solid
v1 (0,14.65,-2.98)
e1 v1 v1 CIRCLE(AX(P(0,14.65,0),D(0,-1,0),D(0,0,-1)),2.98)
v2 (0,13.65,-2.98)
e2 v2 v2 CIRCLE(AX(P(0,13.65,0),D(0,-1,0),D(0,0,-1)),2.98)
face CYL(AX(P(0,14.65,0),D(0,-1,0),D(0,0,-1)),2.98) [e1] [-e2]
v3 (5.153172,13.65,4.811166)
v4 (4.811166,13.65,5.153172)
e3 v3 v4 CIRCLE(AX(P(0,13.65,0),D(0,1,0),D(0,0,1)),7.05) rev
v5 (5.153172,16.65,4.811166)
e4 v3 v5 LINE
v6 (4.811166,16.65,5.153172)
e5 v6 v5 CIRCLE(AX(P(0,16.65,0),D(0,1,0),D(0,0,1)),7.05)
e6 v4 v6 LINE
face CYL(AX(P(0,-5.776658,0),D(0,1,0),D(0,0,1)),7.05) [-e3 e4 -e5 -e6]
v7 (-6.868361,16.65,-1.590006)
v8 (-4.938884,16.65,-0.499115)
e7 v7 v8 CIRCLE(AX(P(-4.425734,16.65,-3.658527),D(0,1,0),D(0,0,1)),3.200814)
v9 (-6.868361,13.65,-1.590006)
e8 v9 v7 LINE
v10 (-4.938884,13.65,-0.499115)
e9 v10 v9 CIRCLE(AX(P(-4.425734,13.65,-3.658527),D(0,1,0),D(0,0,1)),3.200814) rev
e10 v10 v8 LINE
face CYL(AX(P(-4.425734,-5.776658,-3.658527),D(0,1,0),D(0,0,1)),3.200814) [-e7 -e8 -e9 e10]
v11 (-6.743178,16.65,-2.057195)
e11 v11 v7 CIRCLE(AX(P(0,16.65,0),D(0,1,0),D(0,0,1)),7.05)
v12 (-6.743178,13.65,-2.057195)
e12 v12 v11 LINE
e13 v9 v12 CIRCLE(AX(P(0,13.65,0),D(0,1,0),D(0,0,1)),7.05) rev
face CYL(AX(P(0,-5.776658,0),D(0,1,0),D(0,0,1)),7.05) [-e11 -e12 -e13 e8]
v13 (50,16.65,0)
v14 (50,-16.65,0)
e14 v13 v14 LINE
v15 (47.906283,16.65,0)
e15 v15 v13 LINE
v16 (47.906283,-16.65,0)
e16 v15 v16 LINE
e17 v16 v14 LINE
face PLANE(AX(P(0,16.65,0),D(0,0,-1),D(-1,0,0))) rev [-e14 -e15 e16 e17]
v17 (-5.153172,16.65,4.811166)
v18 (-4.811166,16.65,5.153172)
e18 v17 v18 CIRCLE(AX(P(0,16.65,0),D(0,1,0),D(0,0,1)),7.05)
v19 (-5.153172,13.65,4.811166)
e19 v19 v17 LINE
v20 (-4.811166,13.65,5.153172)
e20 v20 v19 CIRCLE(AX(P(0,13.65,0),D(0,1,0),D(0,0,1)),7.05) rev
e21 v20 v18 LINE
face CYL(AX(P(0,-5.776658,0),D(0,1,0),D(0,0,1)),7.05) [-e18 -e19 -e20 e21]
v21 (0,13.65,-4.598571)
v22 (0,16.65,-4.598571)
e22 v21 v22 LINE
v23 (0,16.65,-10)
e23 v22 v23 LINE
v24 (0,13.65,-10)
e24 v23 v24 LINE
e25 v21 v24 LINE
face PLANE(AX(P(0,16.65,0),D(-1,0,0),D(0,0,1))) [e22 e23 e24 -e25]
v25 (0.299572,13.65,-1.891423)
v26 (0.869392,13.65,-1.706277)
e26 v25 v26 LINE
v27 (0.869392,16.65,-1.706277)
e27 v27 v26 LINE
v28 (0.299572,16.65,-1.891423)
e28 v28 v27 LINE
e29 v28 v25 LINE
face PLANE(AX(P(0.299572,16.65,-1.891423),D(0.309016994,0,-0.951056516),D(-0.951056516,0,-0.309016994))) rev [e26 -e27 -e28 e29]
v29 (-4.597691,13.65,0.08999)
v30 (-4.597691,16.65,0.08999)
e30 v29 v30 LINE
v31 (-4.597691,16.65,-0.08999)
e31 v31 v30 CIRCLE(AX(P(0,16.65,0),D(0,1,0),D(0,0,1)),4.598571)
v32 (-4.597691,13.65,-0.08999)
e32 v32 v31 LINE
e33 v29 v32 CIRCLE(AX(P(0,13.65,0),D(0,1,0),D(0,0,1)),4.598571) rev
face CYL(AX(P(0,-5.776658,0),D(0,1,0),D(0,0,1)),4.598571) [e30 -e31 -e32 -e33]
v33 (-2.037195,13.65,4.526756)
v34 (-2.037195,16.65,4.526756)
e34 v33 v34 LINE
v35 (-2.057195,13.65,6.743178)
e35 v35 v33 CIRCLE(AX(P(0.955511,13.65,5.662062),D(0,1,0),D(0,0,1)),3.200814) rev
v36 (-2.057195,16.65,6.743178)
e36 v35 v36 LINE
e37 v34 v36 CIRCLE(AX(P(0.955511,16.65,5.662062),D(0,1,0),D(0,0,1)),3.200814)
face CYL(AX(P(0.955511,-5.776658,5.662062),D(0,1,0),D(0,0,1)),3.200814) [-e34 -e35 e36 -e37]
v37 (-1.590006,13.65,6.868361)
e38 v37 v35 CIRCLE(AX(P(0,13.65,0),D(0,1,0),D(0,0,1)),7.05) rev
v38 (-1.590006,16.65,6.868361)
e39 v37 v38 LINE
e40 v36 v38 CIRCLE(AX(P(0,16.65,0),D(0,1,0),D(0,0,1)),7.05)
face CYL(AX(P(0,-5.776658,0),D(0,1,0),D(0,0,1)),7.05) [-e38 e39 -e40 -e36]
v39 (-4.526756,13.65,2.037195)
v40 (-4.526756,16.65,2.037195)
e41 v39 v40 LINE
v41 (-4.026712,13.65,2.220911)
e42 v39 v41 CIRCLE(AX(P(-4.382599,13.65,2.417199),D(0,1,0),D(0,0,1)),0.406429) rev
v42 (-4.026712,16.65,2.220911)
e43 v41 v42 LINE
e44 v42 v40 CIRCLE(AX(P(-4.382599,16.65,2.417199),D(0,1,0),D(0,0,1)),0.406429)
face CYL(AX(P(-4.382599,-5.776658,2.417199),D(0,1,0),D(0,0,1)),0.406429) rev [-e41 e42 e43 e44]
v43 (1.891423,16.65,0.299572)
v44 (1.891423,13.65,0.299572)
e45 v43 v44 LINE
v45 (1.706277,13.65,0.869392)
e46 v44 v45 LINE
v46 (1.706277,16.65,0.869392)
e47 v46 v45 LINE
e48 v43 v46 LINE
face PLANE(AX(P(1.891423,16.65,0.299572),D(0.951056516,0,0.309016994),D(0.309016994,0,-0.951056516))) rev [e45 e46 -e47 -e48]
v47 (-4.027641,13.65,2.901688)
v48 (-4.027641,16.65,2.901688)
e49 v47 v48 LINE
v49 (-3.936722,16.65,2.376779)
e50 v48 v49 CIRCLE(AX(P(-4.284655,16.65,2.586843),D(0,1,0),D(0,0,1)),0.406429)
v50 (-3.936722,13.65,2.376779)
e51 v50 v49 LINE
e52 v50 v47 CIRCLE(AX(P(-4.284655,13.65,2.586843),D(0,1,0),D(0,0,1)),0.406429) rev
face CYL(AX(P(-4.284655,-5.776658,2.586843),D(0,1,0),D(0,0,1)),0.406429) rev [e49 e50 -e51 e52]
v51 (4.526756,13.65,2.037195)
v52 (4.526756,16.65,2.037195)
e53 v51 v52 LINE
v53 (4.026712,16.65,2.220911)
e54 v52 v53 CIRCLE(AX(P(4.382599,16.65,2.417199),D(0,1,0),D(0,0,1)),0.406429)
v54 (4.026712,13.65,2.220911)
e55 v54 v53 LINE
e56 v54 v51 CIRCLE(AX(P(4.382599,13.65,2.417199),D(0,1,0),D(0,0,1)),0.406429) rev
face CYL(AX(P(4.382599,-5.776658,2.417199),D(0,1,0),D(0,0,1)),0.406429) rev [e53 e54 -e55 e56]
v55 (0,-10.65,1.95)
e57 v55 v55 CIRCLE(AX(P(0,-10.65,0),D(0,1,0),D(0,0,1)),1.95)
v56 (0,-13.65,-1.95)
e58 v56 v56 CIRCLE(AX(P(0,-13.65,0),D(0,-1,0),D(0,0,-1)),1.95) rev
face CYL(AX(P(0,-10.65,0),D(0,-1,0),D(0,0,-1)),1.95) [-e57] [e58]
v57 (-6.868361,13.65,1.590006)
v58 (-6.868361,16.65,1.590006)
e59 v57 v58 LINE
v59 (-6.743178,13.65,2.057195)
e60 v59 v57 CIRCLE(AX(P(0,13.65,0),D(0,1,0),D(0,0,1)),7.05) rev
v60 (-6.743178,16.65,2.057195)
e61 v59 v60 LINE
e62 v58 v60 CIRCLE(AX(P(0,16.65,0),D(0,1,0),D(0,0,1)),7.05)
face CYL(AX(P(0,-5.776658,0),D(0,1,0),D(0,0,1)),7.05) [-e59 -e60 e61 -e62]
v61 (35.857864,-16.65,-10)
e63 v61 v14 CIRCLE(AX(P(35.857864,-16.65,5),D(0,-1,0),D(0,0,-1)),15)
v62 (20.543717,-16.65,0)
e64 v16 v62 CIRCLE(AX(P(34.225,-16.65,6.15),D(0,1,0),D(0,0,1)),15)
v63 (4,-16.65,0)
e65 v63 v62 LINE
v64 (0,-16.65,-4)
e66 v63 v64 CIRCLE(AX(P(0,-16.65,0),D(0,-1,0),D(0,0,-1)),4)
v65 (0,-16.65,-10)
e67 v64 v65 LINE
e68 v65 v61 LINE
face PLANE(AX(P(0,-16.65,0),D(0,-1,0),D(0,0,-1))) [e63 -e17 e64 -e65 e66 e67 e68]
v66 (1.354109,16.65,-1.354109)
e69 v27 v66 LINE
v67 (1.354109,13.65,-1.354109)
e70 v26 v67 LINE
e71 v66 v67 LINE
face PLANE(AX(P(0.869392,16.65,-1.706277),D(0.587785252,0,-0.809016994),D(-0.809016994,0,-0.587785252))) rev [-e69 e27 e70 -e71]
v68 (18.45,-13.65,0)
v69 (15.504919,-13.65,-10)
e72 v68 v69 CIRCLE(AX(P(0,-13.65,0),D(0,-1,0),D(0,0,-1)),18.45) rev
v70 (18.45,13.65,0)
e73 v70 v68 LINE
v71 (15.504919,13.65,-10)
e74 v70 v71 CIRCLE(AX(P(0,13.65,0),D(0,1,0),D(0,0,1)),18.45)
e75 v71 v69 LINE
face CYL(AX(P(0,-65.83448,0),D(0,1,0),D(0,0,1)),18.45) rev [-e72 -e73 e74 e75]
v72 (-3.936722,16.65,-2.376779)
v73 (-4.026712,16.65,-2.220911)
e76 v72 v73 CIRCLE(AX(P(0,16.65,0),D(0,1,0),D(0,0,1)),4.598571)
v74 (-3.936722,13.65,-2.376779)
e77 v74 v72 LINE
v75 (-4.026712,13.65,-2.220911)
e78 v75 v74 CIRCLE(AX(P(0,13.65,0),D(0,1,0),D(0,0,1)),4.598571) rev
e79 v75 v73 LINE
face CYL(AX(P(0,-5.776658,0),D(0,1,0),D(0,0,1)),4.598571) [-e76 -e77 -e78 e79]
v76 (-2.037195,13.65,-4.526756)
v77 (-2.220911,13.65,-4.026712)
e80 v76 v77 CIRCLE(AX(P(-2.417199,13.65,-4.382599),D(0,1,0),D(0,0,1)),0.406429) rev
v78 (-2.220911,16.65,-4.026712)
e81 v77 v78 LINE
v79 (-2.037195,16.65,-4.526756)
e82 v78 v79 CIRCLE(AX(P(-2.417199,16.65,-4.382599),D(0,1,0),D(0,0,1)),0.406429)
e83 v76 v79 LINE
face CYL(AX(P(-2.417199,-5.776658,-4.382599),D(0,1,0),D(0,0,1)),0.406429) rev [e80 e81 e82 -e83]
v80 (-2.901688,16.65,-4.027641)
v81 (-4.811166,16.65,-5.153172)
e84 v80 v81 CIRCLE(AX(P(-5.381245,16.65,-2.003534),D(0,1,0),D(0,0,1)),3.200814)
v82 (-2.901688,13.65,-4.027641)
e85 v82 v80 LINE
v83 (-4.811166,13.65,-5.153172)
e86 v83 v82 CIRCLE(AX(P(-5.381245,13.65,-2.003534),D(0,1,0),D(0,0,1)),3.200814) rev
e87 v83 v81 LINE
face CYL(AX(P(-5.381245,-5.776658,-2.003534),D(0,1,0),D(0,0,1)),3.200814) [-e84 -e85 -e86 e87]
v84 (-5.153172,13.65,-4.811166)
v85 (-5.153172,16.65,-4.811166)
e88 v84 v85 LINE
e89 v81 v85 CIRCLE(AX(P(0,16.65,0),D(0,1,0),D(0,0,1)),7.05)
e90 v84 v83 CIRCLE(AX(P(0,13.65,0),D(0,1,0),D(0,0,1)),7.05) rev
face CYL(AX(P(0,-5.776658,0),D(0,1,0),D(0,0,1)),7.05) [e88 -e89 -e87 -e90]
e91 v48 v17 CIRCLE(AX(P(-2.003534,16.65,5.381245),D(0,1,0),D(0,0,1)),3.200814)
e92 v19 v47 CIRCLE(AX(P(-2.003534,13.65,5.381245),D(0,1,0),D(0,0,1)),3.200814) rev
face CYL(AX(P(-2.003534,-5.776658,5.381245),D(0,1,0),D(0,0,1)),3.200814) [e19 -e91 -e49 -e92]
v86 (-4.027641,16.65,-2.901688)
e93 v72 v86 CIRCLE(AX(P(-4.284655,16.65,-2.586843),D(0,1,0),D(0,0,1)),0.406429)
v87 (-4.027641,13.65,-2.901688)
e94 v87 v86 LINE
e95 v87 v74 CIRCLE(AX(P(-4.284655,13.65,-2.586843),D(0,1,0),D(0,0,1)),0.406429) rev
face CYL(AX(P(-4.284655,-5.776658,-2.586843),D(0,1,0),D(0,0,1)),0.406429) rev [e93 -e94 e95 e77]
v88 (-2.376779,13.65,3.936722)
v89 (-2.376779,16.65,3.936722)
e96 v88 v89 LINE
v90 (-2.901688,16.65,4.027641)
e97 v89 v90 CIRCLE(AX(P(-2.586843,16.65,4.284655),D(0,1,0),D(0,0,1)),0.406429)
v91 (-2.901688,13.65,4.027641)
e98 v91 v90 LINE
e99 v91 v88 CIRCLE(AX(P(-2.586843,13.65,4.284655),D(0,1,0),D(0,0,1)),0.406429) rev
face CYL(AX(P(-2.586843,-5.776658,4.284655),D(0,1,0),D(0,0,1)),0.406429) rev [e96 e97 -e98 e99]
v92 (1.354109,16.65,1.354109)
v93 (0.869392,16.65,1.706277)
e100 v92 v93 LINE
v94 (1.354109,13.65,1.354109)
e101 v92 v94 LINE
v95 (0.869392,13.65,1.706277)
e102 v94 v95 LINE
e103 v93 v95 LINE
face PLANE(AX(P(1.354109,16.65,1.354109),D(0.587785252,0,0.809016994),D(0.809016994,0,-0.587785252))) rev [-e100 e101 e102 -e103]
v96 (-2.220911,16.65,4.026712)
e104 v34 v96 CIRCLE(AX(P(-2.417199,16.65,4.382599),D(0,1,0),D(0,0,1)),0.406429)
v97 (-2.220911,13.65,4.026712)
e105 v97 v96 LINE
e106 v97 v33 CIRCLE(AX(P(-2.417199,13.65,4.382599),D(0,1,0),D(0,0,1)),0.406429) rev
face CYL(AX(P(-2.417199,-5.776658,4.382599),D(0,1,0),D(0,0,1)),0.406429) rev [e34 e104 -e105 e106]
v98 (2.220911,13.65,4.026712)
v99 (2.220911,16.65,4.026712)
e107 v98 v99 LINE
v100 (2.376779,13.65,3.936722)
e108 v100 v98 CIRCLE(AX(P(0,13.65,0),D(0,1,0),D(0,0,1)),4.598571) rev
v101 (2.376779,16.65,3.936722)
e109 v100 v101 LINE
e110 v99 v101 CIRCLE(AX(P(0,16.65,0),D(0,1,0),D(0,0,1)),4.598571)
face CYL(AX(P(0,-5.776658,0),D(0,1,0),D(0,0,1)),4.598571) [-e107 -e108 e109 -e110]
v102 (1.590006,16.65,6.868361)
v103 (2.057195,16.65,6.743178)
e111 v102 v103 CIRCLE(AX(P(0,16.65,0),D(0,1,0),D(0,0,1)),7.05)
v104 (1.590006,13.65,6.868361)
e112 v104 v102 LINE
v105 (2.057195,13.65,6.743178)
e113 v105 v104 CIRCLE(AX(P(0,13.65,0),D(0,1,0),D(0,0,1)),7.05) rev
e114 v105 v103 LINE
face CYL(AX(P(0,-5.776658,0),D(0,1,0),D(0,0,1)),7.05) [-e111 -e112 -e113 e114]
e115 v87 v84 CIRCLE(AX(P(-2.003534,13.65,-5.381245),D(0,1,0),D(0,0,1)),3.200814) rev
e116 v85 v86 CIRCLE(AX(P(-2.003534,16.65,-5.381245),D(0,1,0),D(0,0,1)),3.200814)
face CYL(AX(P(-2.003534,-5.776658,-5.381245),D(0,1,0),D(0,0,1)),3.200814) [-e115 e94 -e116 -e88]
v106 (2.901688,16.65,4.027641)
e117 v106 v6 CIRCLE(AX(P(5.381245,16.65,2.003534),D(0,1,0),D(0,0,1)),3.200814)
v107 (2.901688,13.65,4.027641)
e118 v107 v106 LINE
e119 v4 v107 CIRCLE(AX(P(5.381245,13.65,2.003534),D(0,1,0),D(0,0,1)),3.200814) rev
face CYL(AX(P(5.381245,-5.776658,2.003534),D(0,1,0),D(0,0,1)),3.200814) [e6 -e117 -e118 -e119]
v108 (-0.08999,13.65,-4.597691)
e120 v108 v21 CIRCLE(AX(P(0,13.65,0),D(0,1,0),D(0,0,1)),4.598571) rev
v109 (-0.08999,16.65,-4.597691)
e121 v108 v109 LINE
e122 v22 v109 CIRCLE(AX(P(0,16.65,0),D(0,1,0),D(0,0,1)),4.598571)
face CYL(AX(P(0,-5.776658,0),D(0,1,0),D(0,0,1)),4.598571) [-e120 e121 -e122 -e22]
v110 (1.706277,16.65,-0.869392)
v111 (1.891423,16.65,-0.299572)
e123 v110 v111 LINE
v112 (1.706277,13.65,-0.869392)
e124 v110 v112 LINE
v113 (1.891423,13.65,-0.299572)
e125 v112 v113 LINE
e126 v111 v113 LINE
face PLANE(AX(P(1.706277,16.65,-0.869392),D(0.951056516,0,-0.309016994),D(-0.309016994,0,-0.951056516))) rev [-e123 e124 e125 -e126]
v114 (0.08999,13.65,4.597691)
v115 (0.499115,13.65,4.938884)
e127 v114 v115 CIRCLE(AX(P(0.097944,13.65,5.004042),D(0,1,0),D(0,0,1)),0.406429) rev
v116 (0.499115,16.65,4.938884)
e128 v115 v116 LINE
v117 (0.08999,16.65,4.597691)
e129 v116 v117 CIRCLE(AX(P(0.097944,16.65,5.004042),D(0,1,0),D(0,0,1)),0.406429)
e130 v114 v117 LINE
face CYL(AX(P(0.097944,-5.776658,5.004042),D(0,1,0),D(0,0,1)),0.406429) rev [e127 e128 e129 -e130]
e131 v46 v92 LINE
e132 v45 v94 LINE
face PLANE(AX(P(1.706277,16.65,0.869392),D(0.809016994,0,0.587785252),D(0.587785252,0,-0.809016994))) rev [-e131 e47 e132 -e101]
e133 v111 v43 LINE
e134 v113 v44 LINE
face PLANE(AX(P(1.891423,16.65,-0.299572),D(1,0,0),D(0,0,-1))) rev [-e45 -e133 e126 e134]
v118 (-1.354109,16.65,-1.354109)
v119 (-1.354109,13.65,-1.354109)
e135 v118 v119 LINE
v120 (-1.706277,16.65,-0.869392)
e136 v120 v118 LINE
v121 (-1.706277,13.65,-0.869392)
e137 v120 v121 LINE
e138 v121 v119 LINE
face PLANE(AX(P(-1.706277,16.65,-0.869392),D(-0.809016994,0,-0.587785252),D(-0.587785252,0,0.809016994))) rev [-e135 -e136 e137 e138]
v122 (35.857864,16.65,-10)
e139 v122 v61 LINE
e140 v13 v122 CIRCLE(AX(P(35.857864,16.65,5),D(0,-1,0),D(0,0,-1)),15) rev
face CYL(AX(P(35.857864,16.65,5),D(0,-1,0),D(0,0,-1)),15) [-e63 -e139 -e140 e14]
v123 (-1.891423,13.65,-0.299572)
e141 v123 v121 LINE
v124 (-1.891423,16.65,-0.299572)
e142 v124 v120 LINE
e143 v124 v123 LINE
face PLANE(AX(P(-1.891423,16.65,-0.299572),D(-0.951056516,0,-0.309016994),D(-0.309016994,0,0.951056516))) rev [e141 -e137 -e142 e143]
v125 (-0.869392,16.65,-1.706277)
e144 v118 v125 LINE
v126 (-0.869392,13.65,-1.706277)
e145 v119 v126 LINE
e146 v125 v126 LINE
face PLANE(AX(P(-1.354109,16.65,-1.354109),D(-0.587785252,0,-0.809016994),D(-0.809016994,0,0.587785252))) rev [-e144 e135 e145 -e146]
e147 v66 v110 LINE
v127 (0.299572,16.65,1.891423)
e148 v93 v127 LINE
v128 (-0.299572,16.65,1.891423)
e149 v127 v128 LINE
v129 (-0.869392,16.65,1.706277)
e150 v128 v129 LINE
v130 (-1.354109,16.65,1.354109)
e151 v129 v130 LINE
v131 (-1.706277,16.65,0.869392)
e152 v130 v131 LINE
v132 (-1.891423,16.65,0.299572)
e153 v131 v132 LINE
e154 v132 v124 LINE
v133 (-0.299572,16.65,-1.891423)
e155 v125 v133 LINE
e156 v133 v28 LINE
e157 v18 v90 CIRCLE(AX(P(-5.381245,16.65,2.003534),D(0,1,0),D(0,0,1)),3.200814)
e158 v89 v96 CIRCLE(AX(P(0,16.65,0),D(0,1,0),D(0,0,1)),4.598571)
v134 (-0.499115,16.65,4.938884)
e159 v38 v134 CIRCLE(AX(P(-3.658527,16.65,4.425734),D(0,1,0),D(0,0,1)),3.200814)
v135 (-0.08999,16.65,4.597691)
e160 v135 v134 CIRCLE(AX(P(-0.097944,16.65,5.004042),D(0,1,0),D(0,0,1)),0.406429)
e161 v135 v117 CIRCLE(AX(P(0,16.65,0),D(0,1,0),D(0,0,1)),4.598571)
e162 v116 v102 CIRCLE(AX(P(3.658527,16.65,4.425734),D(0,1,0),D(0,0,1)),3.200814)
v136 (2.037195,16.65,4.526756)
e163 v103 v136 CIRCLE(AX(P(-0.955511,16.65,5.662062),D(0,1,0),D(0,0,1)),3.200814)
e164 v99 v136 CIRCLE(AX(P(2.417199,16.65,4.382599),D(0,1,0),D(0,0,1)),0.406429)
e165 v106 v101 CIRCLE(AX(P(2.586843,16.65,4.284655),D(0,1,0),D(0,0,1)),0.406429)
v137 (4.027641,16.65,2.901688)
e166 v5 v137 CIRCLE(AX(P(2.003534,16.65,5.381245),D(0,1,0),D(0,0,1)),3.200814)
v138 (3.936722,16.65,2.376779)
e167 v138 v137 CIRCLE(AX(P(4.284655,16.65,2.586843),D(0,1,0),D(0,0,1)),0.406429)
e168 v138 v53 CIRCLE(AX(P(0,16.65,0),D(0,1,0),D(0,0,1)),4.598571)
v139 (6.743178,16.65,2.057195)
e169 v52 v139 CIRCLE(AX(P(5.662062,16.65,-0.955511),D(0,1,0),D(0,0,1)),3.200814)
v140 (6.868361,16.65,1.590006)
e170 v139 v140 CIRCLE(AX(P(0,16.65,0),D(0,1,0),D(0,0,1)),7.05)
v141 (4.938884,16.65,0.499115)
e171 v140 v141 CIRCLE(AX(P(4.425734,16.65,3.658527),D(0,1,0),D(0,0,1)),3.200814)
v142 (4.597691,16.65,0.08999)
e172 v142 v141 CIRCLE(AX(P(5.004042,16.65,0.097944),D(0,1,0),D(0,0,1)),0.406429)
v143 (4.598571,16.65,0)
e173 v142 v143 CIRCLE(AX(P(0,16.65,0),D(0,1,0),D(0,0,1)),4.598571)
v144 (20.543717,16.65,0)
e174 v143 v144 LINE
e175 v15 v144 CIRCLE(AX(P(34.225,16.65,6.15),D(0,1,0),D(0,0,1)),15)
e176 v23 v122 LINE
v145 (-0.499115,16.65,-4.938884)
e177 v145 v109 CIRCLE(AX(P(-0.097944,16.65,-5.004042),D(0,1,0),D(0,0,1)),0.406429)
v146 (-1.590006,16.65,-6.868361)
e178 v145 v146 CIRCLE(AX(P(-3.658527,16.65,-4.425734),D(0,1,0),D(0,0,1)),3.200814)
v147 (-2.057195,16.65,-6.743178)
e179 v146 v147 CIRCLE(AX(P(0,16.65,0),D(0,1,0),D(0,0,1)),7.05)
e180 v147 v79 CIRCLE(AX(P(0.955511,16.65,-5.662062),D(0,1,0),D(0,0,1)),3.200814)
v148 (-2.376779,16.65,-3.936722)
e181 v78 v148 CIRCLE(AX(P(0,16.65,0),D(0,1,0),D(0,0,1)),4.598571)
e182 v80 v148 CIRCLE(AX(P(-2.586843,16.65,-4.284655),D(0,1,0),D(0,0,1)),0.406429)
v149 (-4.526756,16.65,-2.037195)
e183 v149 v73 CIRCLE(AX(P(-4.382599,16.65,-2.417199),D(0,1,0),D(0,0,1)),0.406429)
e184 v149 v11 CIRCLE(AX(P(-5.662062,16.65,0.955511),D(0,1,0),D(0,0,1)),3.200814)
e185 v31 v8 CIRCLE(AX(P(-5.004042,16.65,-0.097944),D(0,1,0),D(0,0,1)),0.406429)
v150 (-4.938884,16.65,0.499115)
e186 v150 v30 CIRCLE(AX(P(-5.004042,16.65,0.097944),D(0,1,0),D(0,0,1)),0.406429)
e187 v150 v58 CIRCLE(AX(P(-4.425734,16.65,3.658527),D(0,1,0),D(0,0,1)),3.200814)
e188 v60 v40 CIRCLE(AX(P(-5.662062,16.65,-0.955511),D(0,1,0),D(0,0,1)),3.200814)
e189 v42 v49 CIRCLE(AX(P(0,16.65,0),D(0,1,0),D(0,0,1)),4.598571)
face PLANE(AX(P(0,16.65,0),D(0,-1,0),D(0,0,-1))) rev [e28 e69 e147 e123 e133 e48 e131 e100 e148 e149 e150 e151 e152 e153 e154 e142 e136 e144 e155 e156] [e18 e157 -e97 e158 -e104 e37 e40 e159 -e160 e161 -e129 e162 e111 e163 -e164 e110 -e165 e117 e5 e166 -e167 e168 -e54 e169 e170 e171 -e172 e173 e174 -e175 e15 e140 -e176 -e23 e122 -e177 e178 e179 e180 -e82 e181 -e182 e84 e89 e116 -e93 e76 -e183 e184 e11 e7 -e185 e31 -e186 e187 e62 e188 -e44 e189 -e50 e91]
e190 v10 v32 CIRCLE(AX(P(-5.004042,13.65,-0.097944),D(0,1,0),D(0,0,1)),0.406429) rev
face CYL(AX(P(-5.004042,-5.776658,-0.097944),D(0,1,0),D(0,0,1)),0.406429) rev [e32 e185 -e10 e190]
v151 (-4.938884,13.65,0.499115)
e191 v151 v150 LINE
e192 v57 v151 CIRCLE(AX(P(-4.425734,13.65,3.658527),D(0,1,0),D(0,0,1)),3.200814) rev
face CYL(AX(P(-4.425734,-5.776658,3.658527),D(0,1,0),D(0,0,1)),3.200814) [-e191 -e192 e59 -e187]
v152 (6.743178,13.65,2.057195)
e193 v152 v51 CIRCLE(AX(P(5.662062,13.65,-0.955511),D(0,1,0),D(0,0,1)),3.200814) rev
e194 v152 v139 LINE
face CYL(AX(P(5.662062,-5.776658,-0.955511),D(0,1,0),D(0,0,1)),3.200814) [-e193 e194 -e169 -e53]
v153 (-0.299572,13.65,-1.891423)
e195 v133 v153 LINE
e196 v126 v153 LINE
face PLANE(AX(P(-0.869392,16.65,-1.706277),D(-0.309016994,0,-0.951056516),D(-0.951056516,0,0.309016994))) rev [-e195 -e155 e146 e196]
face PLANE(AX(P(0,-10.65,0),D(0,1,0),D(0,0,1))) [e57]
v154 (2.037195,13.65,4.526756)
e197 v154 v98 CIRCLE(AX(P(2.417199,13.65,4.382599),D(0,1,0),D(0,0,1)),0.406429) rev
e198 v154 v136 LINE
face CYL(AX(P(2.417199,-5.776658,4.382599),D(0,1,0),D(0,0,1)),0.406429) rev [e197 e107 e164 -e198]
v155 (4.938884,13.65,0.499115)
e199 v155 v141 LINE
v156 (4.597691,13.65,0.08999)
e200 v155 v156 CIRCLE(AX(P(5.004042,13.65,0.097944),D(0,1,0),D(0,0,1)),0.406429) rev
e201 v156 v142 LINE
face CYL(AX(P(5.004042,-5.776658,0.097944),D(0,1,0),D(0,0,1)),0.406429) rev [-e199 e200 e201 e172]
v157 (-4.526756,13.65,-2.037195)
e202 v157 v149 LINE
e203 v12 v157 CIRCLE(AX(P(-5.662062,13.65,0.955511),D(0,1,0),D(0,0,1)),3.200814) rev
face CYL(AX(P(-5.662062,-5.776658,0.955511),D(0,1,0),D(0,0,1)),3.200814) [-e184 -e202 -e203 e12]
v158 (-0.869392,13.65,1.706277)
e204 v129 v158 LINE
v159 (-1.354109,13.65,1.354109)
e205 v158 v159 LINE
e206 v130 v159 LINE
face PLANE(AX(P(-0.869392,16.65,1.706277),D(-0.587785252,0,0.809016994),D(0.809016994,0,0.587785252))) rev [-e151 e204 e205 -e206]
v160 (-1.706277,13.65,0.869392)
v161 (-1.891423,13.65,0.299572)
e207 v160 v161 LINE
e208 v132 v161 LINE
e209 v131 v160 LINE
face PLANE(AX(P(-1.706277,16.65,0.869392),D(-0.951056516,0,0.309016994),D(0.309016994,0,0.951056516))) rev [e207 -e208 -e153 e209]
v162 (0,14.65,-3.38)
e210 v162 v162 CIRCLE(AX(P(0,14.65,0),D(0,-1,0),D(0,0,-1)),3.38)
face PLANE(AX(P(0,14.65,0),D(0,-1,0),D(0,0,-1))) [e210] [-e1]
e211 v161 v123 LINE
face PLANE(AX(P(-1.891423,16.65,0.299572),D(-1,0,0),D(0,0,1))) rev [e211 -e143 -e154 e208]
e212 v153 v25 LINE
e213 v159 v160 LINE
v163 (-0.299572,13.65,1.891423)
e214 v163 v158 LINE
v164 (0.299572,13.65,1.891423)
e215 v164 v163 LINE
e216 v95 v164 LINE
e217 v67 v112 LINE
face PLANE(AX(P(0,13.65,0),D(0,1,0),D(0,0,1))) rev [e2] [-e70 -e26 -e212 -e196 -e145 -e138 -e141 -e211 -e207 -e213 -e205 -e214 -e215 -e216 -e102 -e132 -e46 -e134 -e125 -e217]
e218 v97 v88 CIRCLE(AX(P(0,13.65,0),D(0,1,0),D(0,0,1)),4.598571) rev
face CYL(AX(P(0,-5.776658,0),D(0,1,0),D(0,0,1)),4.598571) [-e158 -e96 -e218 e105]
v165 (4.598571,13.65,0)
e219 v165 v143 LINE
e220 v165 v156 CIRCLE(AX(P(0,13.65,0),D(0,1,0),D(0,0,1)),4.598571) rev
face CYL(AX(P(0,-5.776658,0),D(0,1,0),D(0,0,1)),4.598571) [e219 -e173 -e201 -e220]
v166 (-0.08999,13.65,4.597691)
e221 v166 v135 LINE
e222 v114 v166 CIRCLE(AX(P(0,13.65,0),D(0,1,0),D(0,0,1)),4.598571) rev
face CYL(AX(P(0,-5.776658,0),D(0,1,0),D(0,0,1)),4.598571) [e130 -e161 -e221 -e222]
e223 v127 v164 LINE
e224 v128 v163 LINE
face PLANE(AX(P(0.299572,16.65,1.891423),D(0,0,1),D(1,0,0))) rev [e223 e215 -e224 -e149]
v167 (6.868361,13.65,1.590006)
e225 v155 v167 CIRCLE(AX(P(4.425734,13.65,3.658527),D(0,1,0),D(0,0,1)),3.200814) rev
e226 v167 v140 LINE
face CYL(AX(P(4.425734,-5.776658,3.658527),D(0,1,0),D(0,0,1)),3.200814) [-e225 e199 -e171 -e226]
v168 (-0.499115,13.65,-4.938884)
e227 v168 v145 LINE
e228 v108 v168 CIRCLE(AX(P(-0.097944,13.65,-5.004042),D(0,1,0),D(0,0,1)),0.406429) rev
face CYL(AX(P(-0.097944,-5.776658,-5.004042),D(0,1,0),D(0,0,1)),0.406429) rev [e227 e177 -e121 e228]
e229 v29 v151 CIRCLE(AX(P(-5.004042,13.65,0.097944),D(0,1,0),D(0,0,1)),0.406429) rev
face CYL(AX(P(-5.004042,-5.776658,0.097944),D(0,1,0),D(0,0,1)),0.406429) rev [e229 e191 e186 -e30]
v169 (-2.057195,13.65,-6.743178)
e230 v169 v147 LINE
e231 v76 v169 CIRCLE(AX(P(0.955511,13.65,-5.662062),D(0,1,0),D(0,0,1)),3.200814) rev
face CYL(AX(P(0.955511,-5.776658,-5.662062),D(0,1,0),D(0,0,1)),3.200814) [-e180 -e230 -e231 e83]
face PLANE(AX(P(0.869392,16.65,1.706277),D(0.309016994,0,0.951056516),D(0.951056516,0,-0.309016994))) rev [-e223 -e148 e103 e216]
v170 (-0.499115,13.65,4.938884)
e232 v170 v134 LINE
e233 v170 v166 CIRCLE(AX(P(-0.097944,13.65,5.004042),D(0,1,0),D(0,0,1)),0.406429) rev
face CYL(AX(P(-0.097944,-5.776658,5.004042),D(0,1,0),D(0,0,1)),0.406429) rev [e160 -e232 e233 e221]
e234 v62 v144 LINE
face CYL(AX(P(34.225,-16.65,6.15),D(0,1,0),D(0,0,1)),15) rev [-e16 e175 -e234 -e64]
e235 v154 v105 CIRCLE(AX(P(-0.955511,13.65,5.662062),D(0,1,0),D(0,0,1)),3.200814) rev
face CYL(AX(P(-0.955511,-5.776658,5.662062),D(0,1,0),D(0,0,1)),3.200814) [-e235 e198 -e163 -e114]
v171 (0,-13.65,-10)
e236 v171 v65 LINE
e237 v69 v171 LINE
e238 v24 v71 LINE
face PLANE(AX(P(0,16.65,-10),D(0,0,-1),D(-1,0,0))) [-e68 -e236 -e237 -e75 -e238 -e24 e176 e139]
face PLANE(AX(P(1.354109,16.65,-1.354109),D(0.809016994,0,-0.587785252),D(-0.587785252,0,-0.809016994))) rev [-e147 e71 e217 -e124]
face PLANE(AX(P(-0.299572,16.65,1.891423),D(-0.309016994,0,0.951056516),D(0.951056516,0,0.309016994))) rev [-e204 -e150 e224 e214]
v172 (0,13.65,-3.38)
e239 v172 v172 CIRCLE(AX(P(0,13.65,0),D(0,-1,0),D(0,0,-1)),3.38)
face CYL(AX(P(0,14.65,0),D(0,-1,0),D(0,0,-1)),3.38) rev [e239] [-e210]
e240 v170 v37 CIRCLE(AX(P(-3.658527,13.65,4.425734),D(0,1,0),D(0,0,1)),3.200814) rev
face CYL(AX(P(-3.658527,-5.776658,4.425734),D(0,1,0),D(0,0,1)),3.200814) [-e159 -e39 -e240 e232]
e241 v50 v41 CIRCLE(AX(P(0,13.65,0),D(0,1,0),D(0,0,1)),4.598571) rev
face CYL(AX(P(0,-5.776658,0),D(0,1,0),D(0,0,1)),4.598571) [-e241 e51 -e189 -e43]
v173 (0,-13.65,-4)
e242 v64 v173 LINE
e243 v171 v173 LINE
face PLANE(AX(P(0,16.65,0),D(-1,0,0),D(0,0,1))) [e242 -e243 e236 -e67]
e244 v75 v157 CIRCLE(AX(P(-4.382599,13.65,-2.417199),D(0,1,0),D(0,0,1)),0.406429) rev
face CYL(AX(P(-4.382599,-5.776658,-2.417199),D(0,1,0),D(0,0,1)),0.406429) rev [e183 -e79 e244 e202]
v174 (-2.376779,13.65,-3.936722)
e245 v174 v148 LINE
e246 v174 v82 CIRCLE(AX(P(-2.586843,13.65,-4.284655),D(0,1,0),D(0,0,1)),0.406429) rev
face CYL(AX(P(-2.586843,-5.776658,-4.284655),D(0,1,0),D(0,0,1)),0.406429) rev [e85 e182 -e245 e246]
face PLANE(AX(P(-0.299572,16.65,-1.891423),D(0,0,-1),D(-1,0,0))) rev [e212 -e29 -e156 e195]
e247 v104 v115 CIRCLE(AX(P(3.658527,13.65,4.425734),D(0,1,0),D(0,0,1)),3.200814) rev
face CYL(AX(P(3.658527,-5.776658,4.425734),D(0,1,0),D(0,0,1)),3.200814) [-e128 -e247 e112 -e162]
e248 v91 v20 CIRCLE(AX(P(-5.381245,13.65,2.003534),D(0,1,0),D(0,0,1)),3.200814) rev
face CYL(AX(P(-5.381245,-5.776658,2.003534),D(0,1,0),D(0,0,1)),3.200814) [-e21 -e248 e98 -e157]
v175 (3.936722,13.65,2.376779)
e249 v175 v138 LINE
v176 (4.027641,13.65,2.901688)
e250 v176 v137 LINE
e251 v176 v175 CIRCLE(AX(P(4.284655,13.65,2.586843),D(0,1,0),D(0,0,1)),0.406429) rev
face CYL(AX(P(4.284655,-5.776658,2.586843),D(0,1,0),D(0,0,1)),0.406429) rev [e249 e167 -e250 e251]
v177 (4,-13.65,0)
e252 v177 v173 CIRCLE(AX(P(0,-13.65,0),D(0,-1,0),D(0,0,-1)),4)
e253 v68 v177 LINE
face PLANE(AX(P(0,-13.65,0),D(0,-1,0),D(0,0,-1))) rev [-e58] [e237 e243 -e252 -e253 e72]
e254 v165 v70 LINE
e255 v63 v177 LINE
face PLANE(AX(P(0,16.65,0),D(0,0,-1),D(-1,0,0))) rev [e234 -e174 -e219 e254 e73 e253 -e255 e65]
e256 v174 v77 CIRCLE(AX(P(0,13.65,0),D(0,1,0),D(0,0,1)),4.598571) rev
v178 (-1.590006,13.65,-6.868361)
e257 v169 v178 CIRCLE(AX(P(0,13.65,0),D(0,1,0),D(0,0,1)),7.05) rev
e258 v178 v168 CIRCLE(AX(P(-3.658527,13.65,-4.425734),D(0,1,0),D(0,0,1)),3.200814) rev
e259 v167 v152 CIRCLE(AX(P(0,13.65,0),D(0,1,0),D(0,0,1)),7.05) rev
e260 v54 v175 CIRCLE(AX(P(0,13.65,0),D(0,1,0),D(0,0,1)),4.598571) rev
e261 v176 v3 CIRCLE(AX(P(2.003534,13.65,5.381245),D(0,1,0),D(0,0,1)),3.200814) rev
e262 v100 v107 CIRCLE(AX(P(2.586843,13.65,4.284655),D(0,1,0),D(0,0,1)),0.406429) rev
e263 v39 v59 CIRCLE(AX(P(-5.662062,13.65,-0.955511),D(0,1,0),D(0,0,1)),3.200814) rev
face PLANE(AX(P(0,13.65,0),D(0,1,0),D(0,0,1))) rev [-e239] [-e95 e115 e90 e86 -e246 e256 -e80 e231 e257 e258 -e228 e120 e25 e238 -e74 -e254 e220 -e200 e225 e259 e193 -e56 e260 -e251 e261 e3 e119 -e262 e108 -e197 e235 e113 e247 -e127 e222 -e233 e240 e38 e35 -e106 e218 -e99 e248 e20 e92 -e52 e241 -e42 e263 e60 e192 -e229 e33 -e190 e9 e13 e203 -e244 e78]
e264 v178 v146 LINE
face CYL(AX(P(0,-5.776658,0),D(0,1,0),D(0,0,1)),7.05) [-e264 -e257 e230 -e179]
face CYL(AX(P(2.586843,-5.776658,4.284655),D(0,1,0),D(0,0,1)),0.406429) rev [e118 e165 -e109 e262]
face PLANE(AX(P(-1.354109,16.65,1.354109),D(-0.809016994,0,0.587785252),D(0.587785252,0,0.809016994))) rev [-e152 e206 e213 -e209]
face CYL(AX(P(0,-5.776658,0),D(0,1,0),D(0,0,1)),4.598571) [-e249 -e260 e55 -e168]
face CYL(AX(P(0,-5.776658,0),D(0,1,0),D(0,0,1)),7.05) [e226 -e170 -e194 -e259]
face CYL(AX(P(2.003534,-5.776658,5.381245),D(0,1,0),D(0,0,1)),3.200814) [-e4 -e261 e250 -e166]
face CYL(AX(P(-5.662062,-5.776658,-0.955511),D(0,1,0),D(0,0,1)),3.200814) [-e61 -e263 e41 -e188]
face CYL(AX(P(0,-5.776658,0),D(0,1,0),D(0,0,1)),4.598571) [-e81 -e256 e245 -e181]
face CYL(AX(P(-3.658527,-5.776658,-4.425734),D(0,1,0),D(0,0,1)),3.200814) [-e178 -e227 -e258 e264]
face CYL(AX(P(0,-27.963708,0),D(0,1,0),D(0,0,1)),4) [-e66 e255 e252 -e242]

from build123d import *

# Parameters (mm, degrees)
SKETCH1_W           = 50
SKETCH1_H           = 10
BOSS_EXTRUDE2_DEPTH = 16.65
CUT_EXTRUDE1_START  = -27.3
SKETCH2_R           = 18.45
CUT_EXTRUDE1_DEPTH  = 27.3
SKETCH3_R           = 4
BOSS_EXTRUDE3_DEPTH = 3
CUT_EXTRUDE2_DEPTH  = 3
BOSS_EXTRUDE4_START = 3
SKETCH5_R           = 4
BOSS_EXTRUDE4_DEPTH = 3
SKETCH6_R           = 1.95
BOSS_EXTRUDE5_DEPTH = 3
BOSS_EXTRUDE6_DEPTH = 3
SKETCH9_R           = 3.38
SKETCH9_R_2         = 2.98
CUT_EXTRUDE3_DEPTH  = 1
SKETCH10_R          = 15
CUT_EXTRUDE4_DEPTH  = 61.900656811
FILLET1_R           = 15


with BuildPart() as part:
    # Sketch1 → Boss-Extrude2 (new, symmetric)
    with BuildSketch(Plane(origin=(0, 0, 0), x_dir=(1, 0, 0), z_dir=(0, 1, 0))):
        with Locations((25, 5)):
            Rectangle(SKETCH1_W, SKETCH1_H)
    extrude(amount=BOSS_EXTRUDE2_DEPTH, both=True)

    # Sketch2 → Cut-Extrude1 (cut)
    with BuildSketch(Plane(origin=(0, 13.65, 0), x_dir=(1, 0, 0), z_dir=(0, 1, 0)).offset(CUT_EXTRUDE1_START)):
        Circle(SKETCH2_R)
    extrude(amount=CUT_EXTRUDE1_DEPTH, mode=Mode.SUBTRACT)

    # Sketch3 → Boss-Extrude3 (add)
    with BuildSketch(Plane(origin=(0, 13.65, 0), x_dir=(1, 0, 0), z_dir=(0, 1, 0))):
        Circle(SKETCH3_R)
    extrude(amount=BOSS_EXTRUDE3_DEPTH)

    # Sketch4 → Cut-Extrude2 (cut)
    with BuildSketch(Plane.XZ.offset(-13.65)):
        Polygon((0.869391807, 1.706277494), (0.299572001, 1.891423172), (-0.299572001, 1.891423172), (-0.869391807, 1.706277494), (-1.354109486, 1.354109486), (-1.706277494, 0.869391807), (-1.891423172, 0.299572001), (-1.891423172, -0.299572001), (-1.706277494, -0.869391807), (-1.354109486, -1.354109486), (-0.869391807, -1.706277494), (-0.299572001, -1.891423172), (0.299572001, -1.891423172), (0.869391807, -1.706277494), (1.354109486, -1.354109486), (1.706277494, -0.869391807), (1.891423172, -0.299572001), (1.891423172, 0.299572001), (1.706277494, 0.869391807), (1.354109486, 1.354109486), align=None)
    extrude(amount=-CUT_EXTRUDE2_DEPTH, mode=Mode.SUBTRACT)

    # Sketch5 → Boss-Extrude4 (add)
    with BuildSketch(Plane(origin=(0, -13.65, 0), x_dir=(-1, 0, 0), z_dir=(0, -1, 0)).offset(BOSS_EXTRUDE4_START)):
        Circle(SKETCH5_R)
    extrude(amount=-BOSS_EXTRUDE4_DEPTH)

    # Sketch6 → Boss-Extrude5 (add)
    with BuildSketch(Plane(origin=(0, -13.65, 0), x_dir=(1, 0, 0), z_dir=(0, 1, 0))):
        with Locations(Location((0, 0, 0), (0, 0, 90))):
            Circle(SKETCH6_R)
    extrude(amount=BOSS_EXTRUDE5_DEPTH)

    # Sketch7 → Boss-Extrude6 (add)
    with BuildSketch(Plane(origin=(0, 16.65, 0), x_dir=(1, 0, 0), z_dir=(0, 1, 0))):
        with BuildLine():
            ThreePointArc((2.037195172, -4.526756305), (2.035703314, -4.242437448), (2.220911486, -4.026712227))
            ThreePointArc((2.220911486, -4.026712227), (2.299285714, -3.982479678), (2.376779339, -3.93672188))
            ThreePointArc((2.376779339, -3.93672188), (2.656206947, -3.884189508), (2.901688371, -4.027640924))
            ThreePointArc((2.901688371, -4.027640924), (3.755891391, -4.760966743), (4.811166064, -5.153171946))
            ThreePointArc((4.811166064, -5.153171946), (4.985102807, -4.985102807), (5.153171946, -4.811166064))
            ThreePointArc((5.153171946, -4.811166064), (4.760966743, -3.755891391), (4.027640924, -2.901688371))
            ThreePointArc((4.027640924, -2.901688371), (3.884189508, -2.656206947), (3.93672188, -2.376779339))
            ThreePointArc((3.93672188, -2.376779339), (3.982479678, -2.299285714), (4.026712227, -2.220911486))
            ThreePointArc((4.026712227, -2.220911486), (4.242437448, -2.035703314), (4.526756305, -2.037195172))
            ThreePointArc((4.526756305, -2.037195172), (5.63318073, -2.24517245), (6.743178006, -2.057194784))
            ThreePointArc((6.743178006, -2.057194784), (6.809777075, -1.824674268), (6.868360847, -1.59000606))
            ThreePointArc((6.868360847, -1.59000606), (6.001063841, -0.872213987), (4.938883542, -0.499115381))
            ThreePointArc((4.938883542, -0.499115381), (4.69191026, -0.35824794), (4.597690825, -0.089990347))
            ThreePointArc((4.597690825, -0.089990347), (4.598571429, 0), (4.597690825, 0.089990347))
            ThreePointArc((4.597690825, 0.089990347), (4.69191026, 0.35824794), (4.938883542, 0.499115381))
            ThreePointArc((4.938883542, 0.499115381), (6.001063841, 0.872213987), (6.868360847, 1.59000606))
            ThreePointArc((6.868360847, 1.59000606), (6.809777075, 1.824674268), (6.743178006, 2.057194784))
            ThreePointArc((6.743178006, 2.057194784), (5.63318073, 2.24517245), (4.526756305, 2.037195172))
            ThreePointArc((4.526756305, 2.037195172), (4.242437448, 2.035703314), (4.026712227, 2.220911486))
            ThreePointArc((4.026712227, 2.220911486), (3.982479678, 2.299285714), (3.93672188, 2.376779339))
            ThreePointArc((3.93672188, 2.376779339), (3.884189508, 2.656206947), (4.027640924, 2.901688371))
            ThreePointArc((4.027640924, 2.901688371), (4.760966743, 3.755891391), (5.153171946, 4.811166064))
            ThreePointArc((5.153171946, 4.811166064), (4.985102807, 4.985102807), (4.811166064, 5.153171946))
            ThreePointArc((4.811166064, 5.153171946), (3.755891391, 4.760966743), (2.901688371, 4.027640924))
            ThreePointArc((2.901688371, 4.027640924), (2.656206947, 3.884189508), (2.376779339, 3.93672188))
            ThreePointArc((2.376779339, 3.93672188), (2.299285714, 3.982479678), (2.220911486, 4.026712227))
            ThreePointArc((2.220911486, 4.026712227), (2.035703314, 4.242437448), (2.037195172, 4.526756305))
            ThreePointArc((2.037195172, 4.526756305), (2.24517245, 5.63318073), (2.057194784, 6.743178006))
            ThreePointArc((2.057194784, 6.743178006), (1.824674268, 6.809777075), (1.59000606, 6.868360847))
            ThreePointArc((1.59000606, 6.868360847), (0.872213987, 6.001063841), (0.499115381, 4.938883542))
            ThreePointArc((0.499115381, 4.938883542), (0.35824794, 4.69191026), (0.089990347, 4.597690825))
            ThreePointArc((0.089990347, 4.597690825), (0, 4.598571429), (-0.089990347, 4.597690825))
            ThreePointArc((-0.089990347, 4.597690825), (-0.35824794, 4.69191026), (-0.499115381, 4.938883542))
            ThreePointArc((-0.499115381, 4.938883542), (-0.872213987, 6.001063841), (-1.59000606, 6.868360847))
            ThreePointArc((-1.59000606, 6.868360847), (-1.824674268, 6.809777075), (-2.057194784, 6.743178006))
            ThreePointArc((-2.057194784, 6.743178006), (-2.24517245, 5.63318073), (-2.037195172, 4.526756305))
            ThreePointArc((-2.037195172, 4.526756305), (-2.035703314, 4.242437448), (-2.220911486, 4.026712227))
            ThreePointArc((-2.220911486, 4.026712227), (-2.299285714, 3.982479678), (-2.376779339, 3.93672188))
            ThreePointArc((-2.376779339, 3.93672188), (-2.656206947, 3.884189508), (-2.901688371, 4.027640924))
            ThreePointArc((-2.901688371, 4.027640924), (-3.755891391, 4.760966743), (-4.811166064, 5.153171946))
            ThreePointArc((-4.811166064, 5.153171946), (-4.985102807, 4.985102807), (-5.153171946, 4.811166064))
            ThreePointArc((-5.153171946, 4.811166064), (-4.760966743, 3.755891391), (-4.027640924, 2.901688371))
            ThreePointArc((-4.027640924, 2.901688371), (-3.884189508, 2.656206947), (-3.93672188, 2.376779339))
            ThreePointArc((-3.93672188, 2.376779339), (-3.982479678, 2.299285714), (-4.026712227, 2.220911486))
            ThreePointArc((-4.026712227, 2.220911486), (-4.242437448, 2.035703314), (-4.526756305, 2.037195172))
            ThreePointArc((-4.526756305, 2.037195172), (-5.63318073, 2.24517245), (-6.743178006, 2.057194784))
            ThreePointArc((-6.743178006, 2.057194784), (-6.809777075, 1.824674268), (-6.868360847, 1.59000606))
            ThreePointArc((-6.868360847, 1.59000606), (-6.001063841, 0.872213987), (-4.938883542, 0.499115381))
            ThreePointArc((-4.938883542, 0.499115381), (-4.69191026, 0.35824794), (-4.597690825, 0.089990347))
            ThreePointArc((-4.597690825, 0.089990347), (-4.598571429, 0), (-4.597690825, -0.089990347))
            ThreePointArc((-4.597690825, -0.089990347), (-4.69191026, -0.35824794), (-4.938883542, -0.499115381))
            ThreePointArc((-4.938883542, -0.499115381), (-6.001063841, -0.872213987), (-6.868360847, -1.59000606))
            ThreePointArc((-6.868360847, -1.59000606), (-6.809777075, -1.824674268), (-6.743178006, -2.057194784))
            ThreePointArc((-6.743178006, -2.057194784), (-5.63318073, -2.24517245), (-4.526756305, -2.037195172))
            ThreePointArc((-4.526756305, -2.037195172), (-4.242437448, -2.035703314), (-4.026712227, -2.220911486))
            ThreePointArc((-4.026712227, -2.220911486), (-3.982479678, -2.299285714), (-3.93672188, -2.376779339))
            ThreePointArc((-3.93672188, -2.376779339), (-3.884189508, -2.656206947), (-4.027640924, -2.901688371))
            ThreePointArc((-4.027640924, -2.901688371), (-4.760966743, -3.755891391), (-5.153171946, -4.811166064))
            ThreePointArc((-5.153171946, -4.811166064), (-4.985102807, -4.985102807), (-4.811166064, -5.153171946))
            ThreePointArc((-4.811166064, -5.153171946), (-3.755891391, -4.760966743), (-2.901688371, -4.027640924))
            ThreePointArc((-2.901688371, -4.027640924), (-2.656206947, -3.884189508), (-2.376779339, -3.93672188))
            ThreePointArc((-2.376779339, -3.93672188), (-2.299285714, -3.982479678), (-2.220911486, -4.026712227))
            ThreePointArc((-2.220911486, -4.026712227), (-2.035703314, -4.242437448), (-2.037195172, -4.526756305))
            ThreePointArc((-2.037195172, -4.526756305), (-2.24517245, -5.63318073), (-2.057194784, -6.743178006))
            ThreePointArc((-2.057194784, -6.743178006), (-1.824674268, -6.809777075), (-1.59000606, -6.868360847))
            ThreePointArc((-1.59000606, -6.868360847), (-0.872213987, -6.001063841), (-0.499115381, -4.938883542))
            ThreePointArc((-0.499115381, -4.938883542), (-0.35824794, -4.69191026), (-0.089990347, -4.597690825))
            ThreePointArc((-0.089990347, -4.597690825), (0, -4.598571429), (0.089990347, -4.597690825))
            ThreePointArc((0.089990347, -4.597690825), (0.35824794, -4.69191026), (0.499115381, -4.938883542))
            ThreePointArc((0.499115381, -4.938883542), (0.872213987, -6.001063841), (1.59000606, -6.868360847))
            ThreePointArc((1.59000606, -6.868360847), (1.824674268, -6.809777075), (2.057194784, -6.743178006))
            ThreePointArc((2.057194784, -6.743178006), (2.24517245, -5.63318073), (2.037195172, -4.526756305))
        make_face()
        Polygon((1.706277494, -0.869391807), (1.354109486, -1.354109486), (0.869391807, -1.706277494), (0.299572001, -1.891423172), (-0.299572001, -1.891423172), (-0.869391807, -1.706277494), (-1.354109486, -1.354109486), (-1.706277494, -0.869391807), (-1.891423172, -0.299572001), (-1.891423172, 0.299572001), (-1.706277494, 0.869391807), (-1.354109486, 1.354109486), (-0.869391807, 1.706277494), (-0.299572001, 1.891423172), (0.299572001, 1.891423172), (0.869391807, 1.706277494), (1.354109486, 1.354109486), (1.706277494, 0.869391807), (1.891423172, 0.299572001), (1.891423172, -0.299572001), align=None, mode=Mode.SUBTRACT)
    extrude(amount=-BOSS_EXTRUDE6_DEPTH)

    # Sketch9 → Cut-Extrude3 (cut)
    with BuildSketch(Plane.XZ.offset(-13.65)):
        with Locations(Location((0, 0, 0), (0, 0, 270))):
            Circle(SKETCH9_R)
        with Locations(Location((0, 0, 0), (0, 0, 270))):
            Circle(SKETCH9_R_2, mode=Mode.SUBTRACT)
    extrude(amount=-CUT_EXTRUDE3_DEPTH, mode=Mode.SUBTRACT)

    # Sketch10 → Cut-Extrude4 (cut, through all)
    with BuildSketch(Plane(origin=(0, 16.65, 0), x_dir=(1, 0, 0), z_dir=(0, 1, 0))):
        with Locations((34.225, -6.15)):
            Circle(SKETCH10_R)
    extrude(amount=-CUT_EXTRUDE4_DEPTH, mode=Mode.SUBTRACT)

    # Fillet1
    # the kernel refuses this fillet: 15 mm, written as the material it takes off along each edge
    with BuildSketch(Plane(origin=(50, -52.005339059, -10), x_dir=(-1, 0, 0), z_dir=(0, 1, 0))) as fillet1_piece_1:
        with BuildLine():
            CenterArc((14.142135624, 15), FILLET1_R, 199.471220634, 70.528779366)
            Line((0, 10), (-0.282842712, 9.9))
            ThreePointArc((-0.282842712, 9.9), (-0.3, 5), (-0.3, 0))
            Line((-0.3, 0), (0, -0.3))
            Line((0, -0.3), (14.142135624, -0.3))
            Line((14.142135624, -0.3), (14.142135624, 0))
        make_face()
    extrude(amount=104.010678119, mode=Mode.SUBTRACT)


solid = part.part
